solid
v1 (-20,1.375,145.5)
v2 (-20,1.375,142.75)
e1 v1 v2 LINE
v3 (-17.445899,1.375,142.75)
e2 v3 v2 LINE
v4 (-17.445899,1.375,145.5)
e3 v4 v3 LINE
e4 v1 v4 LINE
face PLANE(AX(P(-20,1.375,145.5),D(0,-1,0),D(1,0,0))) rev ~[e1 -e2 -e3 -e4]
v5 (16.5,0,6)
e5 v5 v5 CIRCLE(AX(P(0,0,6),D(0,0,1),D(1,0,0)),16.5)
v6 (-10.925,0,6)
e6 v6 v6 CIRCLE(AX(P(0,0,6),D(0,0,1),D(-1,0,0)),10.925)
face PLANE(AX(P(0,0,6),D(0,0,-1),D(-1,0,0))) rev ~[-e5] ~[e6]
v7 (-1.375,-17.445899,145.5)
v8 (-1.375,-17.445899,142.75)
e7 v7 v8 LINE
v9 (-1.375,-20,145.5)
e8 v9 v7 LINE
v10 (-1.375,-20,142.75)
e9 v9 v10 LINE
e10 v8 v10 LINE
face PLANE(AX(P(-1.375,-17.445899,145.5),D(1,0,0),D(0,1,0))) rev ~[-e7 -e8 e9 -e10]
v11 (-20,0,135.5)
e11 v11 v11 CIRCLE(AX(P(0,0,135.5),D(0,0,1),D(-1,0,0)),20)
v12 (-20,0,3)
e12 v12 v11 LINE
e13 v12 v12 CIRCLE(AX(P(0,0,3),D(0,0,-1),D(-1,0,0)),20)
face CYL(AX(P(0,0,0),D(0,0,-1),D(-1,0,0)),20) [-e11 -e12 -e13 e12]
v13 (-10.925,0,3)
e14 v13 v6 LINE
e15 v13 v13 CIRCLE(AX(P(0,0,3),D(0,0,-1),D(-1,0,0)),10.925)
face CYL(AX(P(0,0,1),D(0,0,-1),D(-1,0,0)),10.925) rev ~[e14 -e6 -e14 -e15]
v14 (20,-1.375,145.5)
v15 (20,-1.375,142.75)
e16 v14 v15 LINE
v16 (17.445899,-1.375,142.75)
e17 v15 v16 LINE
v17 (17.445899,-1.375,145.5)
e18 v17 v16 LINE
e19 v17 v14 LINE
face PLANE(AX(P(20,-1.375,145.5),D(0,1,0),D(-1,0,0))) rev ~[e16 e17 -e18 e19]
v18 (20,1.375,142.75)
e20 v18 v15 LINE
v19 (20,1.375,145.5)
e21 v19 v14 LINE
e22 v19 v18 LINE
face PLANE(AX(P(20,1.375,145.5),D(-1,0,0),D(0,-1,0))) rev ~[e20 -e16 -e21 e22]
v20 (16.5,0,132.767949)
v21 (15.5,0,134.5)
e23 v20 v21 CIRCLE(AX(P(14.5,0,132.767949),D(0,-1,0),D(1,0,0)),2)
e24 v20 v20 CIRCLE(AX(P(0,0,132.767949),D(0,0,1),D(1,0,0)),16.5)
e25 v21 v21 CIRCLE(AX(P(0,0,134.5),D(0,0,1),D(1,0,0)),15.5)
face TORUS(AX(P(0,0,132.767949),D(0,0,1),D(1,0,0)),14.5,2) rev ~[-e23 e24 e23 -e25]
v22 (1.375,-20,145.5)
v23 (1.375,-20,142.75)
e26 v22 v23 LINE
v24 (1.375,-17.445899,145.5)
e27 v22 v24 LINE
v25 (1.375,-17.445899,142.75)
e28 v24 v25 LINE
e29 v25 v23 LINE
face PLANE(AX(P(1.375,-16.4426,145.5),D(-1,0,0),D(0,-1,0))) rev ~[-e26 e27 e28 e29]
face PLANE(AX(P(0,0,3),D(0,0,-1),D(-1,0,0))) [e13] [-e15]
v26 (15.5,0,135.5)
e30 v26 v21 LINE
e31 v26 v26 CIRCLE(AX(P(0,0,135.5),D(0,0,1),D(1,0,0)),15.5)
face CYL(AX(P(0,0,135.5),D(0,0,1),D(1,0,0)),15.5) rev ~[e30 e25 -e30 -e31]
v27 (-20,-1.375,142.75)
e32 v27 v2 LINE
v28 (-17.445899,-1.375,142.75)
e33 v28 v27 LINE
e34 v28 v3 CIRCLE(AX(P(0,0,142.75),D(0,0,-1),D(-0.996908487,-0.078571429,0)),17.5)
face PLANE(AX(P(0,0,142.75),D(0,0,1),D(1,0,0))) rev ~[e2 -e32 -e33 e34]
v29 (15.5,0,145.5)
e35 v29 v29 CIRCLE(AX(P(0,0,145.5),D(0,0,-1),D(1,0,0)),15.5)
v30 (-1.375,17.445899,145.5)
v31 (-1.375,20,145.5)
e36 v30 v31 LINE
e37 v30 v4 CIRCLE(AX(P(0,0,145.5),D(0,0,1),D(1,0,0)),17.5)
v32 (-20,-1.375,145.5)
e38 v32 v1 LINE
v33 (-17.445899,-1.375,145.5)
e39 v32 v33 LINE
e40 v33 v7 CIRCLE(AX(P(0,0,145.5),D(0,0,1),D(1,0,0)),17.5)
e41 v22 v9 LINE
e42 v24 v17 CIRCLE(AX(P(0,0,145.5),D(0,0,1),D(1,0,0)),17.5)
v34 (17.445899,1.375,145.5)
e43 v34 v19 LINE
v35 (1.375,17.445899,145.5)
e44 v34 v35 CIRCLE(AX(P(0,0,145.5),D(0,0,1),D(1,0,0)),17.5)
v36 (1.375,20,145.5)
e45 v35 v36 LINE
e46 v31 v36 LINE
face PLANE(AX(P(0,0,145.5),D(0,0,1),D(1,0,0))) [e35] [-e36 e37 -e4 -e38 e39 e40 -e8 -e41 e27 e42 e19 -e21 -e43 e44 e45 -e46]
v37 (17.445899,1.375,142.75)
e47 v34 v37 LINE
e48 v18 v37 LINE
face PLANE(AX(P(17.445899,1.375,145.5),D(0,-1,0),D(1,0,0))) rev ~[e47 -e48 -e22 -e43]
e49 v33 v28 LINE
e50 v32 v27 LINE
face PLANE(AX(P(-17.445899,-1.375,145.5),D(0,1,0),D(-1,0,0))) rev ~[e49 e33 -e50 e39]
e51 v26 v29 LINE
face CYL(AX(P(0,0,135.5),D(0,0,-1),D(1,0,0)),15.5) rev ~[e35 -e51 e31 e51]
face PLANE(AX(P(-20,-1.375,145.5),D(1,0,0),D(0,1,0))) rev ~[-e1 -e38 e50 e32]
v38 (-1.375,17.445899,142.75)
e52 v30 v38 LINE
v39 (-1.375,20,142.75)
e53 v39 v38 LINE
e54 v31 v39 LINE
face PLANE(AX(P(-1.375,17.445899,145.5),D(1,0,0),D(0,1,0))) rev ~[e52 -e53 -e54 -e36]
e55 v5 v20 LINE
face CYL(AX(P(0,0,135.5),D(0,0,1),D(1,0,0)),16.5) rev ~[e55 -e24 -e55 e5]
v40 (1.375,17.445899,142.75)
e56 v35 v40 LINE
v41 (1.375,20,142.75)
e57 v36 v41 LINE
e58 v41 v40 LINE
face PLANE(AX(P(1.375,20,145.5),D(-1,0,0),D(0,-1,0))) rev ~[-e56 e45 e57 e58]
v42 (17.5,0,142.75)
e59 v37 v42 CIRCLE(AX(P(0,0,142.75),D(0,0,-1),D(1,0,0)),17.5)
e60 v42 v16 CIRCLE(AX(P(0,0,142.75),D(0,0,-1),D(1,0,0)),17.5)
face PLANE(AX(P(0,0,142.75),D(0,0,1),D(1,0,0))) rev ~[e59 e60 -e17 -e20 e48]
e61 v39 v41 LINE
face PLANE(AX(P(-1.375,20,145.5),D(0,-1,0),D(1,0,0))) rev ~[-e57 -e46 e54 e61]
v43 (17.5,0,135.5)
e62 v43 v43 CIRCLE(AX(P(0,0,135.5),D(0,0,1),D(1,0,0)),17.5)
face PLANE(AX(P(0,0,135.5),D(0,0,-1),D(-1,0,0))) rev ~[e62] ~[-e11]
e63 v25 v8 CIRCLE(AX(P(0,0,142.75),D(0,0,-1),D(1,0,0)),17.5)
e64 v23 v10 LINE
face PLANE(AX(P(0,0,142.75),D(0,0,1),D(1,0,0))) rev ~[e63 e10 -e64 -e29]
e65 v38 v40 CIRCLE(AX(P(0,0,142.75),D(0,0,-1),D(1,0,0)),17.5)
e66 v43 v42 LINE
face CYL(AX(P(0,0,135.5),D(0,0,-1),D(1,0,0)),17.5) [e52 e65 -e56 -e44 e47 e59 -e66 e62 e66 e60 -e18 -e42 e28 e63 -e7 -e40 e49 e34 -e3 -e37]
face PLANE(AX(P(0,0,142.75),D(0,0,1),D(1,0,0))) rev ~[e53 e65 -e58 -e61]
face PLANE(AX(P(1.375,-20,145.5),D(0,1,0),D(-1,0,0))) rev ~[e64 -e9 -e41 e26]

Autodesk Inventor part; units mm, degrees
ref_plane "YZ Plane" through (0, 0, 0) normal (1, 0, 0) x (0, 1, 0)
ref_plane "XZ Plane" through (0, 0, 0) normal (0, 1, 0) x (-1, 0, 0)
ref_plane "XY Plane" through (0, 0, 0) normal (0, 0, 1) x (1, 0, 0)
sketch "Boceto1" plane through (0, 0, 0) normal (0, 0, 1) x (1, 0, 0)
  circle A0 centre (0, 0) radius 15
  dimension "d0" = 30
extrude "Extrusión1" add sketch "Boceto1" along normal blind 145.5
sketch "Boceto2" plane through (0, 0, 145.5) normal (0, 0, 1) x (1, 0, 0)
  circle A0 centre (0, 0) radius 12.5
  circle A1 centre (0, 0) radius 15
  dimension "d5" = 25
extrude "Extrusión2" cut sketch "Boceto2" against normal blind 10
sketch "Boceto3" plane through (0, 0, 145.5) normal (0, 0, 1) x (1, 0, 0)
  circle A0 centre (0, 0) radius 10
  dimension "d8" = 20
extrude "Extrusión3" cut sketch "Boceto3" against normal blind 145.5
sketch "Boceto4" plane through (0, 0, 145.5) normal (0, 0, 1) x (1, 0, 0)
  circle A0 centre (0, 0) radius 15
  circle A1 centre (0, 0) radius 12.5 projected
  line L0 (-14.9345, 1.4) -> (-12.4214, 1.4)
  line L1 (-12.4214, 1.4) -> (-12.4214, -1.4)
  line L2 (-12.4214, -1.4) -> (-14.9345, -1.4)
  line L3 (-15.0786, 1.4) -> (-12.4214, -1.4) construction
  line L4 (-12.4214, 1.4) -> (-14.9469, -1.2612) construction
  line L5 (-1.4, -14.9345) -> (-1.4, -12.4214)
  line L6 (-1.4, -12.4214) -> (1.4, -12.4214)
  line L7 (1.4, -12.4214) -> (1.4, -14.9345)
  line L8 (-1.4, -15.0786) -> (1.4, -12.4214) construction
  line L9 (-1.4, -12.4214) -> (1.2612, -14.9469) construction
  line L10 (14.9345, -1.4) -> (12.4214, -1.4)
  line L11 (12.4214, -1.4) -> (12.4214, 1.4)
  line L12 (12.4214, 1.4) -> (14.9345, 1.4)
  line L13 (15.0786, -1.4) -> (12.4214, 1.4) construction
  line L14 (12.4214, -1.4) -> (14.9469, 1.2612) construction
  line L15 (1.4, 14.9345) -> (1.4, 12.4214)
  line L16 (1.4, 12.4214) -> (-1.4, 12.4214)
  line L17 (-1.4, 12.4214) -> (-1.4, 14.9345)
  line L18 (1.4, 15.0786) -> (-1.4, 12.4214) construction
  line L19 (1.4, 12.4214) -> (-1.2612, 14.9469) construction
  point P0 (-13.75, 0)
  point P1 (0, -13.75)
  point P2 (13.75, 0)
  point P3 (0, 13.75)
  dimension "d12" = 2.8
  dimension "d15" = 360
extrude "Extrusión4" add sketch "Boceto4" against normal blind 2.8 contours A0 L10 A1 L12 | L15 A1 L17 A0 | A0 L5 A1 L7 | L0 A1 L2 A0
sketch "Boceto5" plane through (0, 0, 0) normal (0, 0, -1) x (-1, 0, 0)
  circle A0 centre (0, 0) radius 12.5
  circle A1 centre (0, 0) radius 10
extrude "Extrusión5" cut sketch "Boceto5" against normal blind 133
fillet "Empalme1" radius 2.5 1 edges at (12.5, 0, 133)
sketch "Boceto6" plane through (0, 0, 0) normal (0, 0, -1) x (-1, 0, 0)
  circle A0 centre (0, 0) radius 12.5 projected
  circle A1 centre (0, 0) radius 12.5
  circle A2 centre (0, 0) radius 10.925
  dimension "d22" = 21.85
extrude "Extrusión6" add sketch "Boceto6" against normal blind 5
sketch "Boceto7" plane through (0, 0, 0) normal (0, 0, -1) x (-1, 0, 0)
  circle A0 centre (0, 0) radius 17.5
  circle A1 centre (0, 0) radius 15
  dimension "d25" = 35
  dimension "d28" = 30
extrude "Extrusión7" add sketch "Boceto7" against normal blind 135.5
sketch "Boceto9" plane through (0, 0, 0) normal (0, 0, -1) x (-1, 0, 0)
  circle A0 centre (0, 0) radius 16.5
  dimension "d29" = 33
extrude "Extrusión8" cut sketch "Boceto9" against normal blind 135.5
sketch "Boceto10" plane through (0, 0, 0) normal (0, 0, -1) x (-1, 0, 0)
  circle A0 centre (0, 0) radius 16.5
  circle A1 centre (0, 0) radius 10.925
  dimension "d32" = 21.85
extrude "Extrusión9" add sketch "Boceto10" against normal blind 5
sketch "Boceto11" plane through (0, 0, 0) normal (0, 0, -1) x (-1, 0, 0)
  circle A0 centre (0, 0) radius 17.5 projected
  circle A1 centre (0, 0) radius 20
  circle A2 centre (0, 0) radius 17.5
  dimension "d35" = 40
  dimension "d36" = 35
extrude "Extrusión10" add sketch "Boceto11" against normal blind 135.5
sketch "Boceto12" plane through (0, 0, 135.5) normal (0, 0, 1) x (1, 0, 0)
  circle A0 centre (0, 0) radius 17.5
  circle A1 centre (0, 0) radius 16.5
  dimension "d39" = 35
extrude "Extrusión11" cut sketch "Boceto12" against normal blind 134
sketch "Boceto13" plane through (0, 0, 145.5) normal (0, 0, 1) x (1, 0, 0)
  circle A0 centre (0, 0) radius 15.5
  circle A1 centre (0, 0) radius 17.5
  dimension "d42" = 31
extrude "Extrusión12" cut sketch "Boceto13" against normal blind 10 contours A0
sketch "Boceto14" plane through (0, 0, 135.5) normal (0, 0, 1) x (1, 0, 0)
  circle A0 centre (0, 0) radius 17.5
  circle A1 centre (0, 0) radius 15.5
  dimension "d45" = 31
extrude "Extrusión13" add sketch "Boceto14" along normal blind 10
sketch "Boceto15" plane through (0, 0, 145.5) normal (0, 0, 1) x (1, 0, 0)
  line L0 (-20, 1.375) -> (-16.4197, 1.375)
  line L1 (-16.4426, -1.375) -> (-20, -1.375)
  line L2 (-20, -1.375) -> (-20, 1.375)
  circle A0 centre (0, 0) radius 17.5 projected
  line L3 (-16.4197, 1.375) -> (-16.4426, -1.375)
  circle A1 centre (0, 0) radius 16.5 projected
  line L4 (-1.375, -20) -> (-1.375, -16.4197)
  line L5 (1.375, -16.4426) -> (1.375, -20)
  line L6 (1.375, -20) -> (-1.375, -20)
  line L7 (-1.375, -16.4197) -> (1.375, -16.4426)
  line L8 (20, -1.375) -> (16.4197, -1.375)
  line L9 (16.4426, 1.375) -> (20, 1.375)
  line L10 (20, 1.375) -> (20, -1.375)
  line L11 (16.4197, -1.375) -> (16.4426, 1.375)
  line L12 (1.375, 20) -> (1.375, 16.4197)
  line L13 (-1.375, 16.4426) -> (-1.375, 20)
  line L14 (-1.375, 20) -> (1.375, 20)
  line L15 (1.375, 16.4197) -> (-1.375, 16.4426)
  point P0 (-17.5, 0)
  point P1 (0, -17.5)
  point P2 (17.5, 0)
  point P3 (0, 17.5)
  dimension "d52" = 360
extrude "Extrusión14" add sketch "Boceto15" against normal blind 2.75 contours L0 A0 L1 L2 | L0 A1 L1 A0 | L0 L3 A1 | L13 L14 L12 A0 | A0 L12 A1 L13 | A1 L12 L15 | L4 A1 L5 A0 | A0 L5 L6 L4 | L4 L7 A1 | L9 L10 L8 A0 | A0 L8 A1 L9 | A1 L8 L11
sketch "Boceto16" plane through (0, 0, 0) normal (0, 0, -1) x (-1, 0, 0)
  circle A0 centre (0, 0) radius 20 projected
  circle A1 centre (0, 0) radius 10.925 projected
extrude "Extrusión15" cut sketch "Boceto16" against normal blind 1
sketch "Boceto17" plane through (0, 0, 1) normal (0, 0, -1) x (-1, 0, 0)
  circle A0 centre (0, 0) radius 17.5
  dimension "d58" = 35
extrude "Extrusión16" cut sketch "Boceto17" against normal blind 20
sketch "Boceto18" plane through (0, 0, 1) normal (0, 0, -1) x (-1, 0, 0)
  circle A0 centre (0, 0) radius 17.5
  circle A1 centre (0, 0) radius 10.925
  dimension "d61" = 21.85
  dimension "d62" = 35
extrude "Extrusión17" add sketch "Boceto18" against normal blind 5
sketch "Boceto19" plane through (0, 0, 1) normal (0, 0, -1) x (-1, 0, 0)
  circle A0 centre (0, 0) radius 10.925 projected
  circle A1 centre (0, 0) radius 20 projected
extrude "Extrusión18" cut sketch "Boceto19" against normal blind 2
thicken "Engrosado1" operation add thickness 1 both sides no extend neighbours no toward (-0.9870503, 0.1604113, 0) faces at (17.2734, -2.8072, 92.3333) (16.5137, -2.6325, 135.5)
fillet "Empalme2" radius 2 1 edges at (-16.5, 0, 134.5)
equation "\"Radio_pliegue\" = Grosor"
equation "\"Anchura_desahogo_plegado\" = Grosor"
equation "\"Profundidad_desahogo_plegado\" = 0.5 * Grosor"
equation "\"Tamaño_destalonado\" = 4 * Grosor"
equation "\"Remanente_mínimo\" = 2 * Grosor"
equation "\"Radiodetransición\" = Radio_pliegue"
equation "\"Tamaño_de_radio_de_Jacobi\" = Radio_pliegue"
equation "\"TamañoSeparación\" = Grosor"
equation "\"Grosor\" = 0.5"
properties part number "HERRAMIENTA_p2" material "Plástico PET"
